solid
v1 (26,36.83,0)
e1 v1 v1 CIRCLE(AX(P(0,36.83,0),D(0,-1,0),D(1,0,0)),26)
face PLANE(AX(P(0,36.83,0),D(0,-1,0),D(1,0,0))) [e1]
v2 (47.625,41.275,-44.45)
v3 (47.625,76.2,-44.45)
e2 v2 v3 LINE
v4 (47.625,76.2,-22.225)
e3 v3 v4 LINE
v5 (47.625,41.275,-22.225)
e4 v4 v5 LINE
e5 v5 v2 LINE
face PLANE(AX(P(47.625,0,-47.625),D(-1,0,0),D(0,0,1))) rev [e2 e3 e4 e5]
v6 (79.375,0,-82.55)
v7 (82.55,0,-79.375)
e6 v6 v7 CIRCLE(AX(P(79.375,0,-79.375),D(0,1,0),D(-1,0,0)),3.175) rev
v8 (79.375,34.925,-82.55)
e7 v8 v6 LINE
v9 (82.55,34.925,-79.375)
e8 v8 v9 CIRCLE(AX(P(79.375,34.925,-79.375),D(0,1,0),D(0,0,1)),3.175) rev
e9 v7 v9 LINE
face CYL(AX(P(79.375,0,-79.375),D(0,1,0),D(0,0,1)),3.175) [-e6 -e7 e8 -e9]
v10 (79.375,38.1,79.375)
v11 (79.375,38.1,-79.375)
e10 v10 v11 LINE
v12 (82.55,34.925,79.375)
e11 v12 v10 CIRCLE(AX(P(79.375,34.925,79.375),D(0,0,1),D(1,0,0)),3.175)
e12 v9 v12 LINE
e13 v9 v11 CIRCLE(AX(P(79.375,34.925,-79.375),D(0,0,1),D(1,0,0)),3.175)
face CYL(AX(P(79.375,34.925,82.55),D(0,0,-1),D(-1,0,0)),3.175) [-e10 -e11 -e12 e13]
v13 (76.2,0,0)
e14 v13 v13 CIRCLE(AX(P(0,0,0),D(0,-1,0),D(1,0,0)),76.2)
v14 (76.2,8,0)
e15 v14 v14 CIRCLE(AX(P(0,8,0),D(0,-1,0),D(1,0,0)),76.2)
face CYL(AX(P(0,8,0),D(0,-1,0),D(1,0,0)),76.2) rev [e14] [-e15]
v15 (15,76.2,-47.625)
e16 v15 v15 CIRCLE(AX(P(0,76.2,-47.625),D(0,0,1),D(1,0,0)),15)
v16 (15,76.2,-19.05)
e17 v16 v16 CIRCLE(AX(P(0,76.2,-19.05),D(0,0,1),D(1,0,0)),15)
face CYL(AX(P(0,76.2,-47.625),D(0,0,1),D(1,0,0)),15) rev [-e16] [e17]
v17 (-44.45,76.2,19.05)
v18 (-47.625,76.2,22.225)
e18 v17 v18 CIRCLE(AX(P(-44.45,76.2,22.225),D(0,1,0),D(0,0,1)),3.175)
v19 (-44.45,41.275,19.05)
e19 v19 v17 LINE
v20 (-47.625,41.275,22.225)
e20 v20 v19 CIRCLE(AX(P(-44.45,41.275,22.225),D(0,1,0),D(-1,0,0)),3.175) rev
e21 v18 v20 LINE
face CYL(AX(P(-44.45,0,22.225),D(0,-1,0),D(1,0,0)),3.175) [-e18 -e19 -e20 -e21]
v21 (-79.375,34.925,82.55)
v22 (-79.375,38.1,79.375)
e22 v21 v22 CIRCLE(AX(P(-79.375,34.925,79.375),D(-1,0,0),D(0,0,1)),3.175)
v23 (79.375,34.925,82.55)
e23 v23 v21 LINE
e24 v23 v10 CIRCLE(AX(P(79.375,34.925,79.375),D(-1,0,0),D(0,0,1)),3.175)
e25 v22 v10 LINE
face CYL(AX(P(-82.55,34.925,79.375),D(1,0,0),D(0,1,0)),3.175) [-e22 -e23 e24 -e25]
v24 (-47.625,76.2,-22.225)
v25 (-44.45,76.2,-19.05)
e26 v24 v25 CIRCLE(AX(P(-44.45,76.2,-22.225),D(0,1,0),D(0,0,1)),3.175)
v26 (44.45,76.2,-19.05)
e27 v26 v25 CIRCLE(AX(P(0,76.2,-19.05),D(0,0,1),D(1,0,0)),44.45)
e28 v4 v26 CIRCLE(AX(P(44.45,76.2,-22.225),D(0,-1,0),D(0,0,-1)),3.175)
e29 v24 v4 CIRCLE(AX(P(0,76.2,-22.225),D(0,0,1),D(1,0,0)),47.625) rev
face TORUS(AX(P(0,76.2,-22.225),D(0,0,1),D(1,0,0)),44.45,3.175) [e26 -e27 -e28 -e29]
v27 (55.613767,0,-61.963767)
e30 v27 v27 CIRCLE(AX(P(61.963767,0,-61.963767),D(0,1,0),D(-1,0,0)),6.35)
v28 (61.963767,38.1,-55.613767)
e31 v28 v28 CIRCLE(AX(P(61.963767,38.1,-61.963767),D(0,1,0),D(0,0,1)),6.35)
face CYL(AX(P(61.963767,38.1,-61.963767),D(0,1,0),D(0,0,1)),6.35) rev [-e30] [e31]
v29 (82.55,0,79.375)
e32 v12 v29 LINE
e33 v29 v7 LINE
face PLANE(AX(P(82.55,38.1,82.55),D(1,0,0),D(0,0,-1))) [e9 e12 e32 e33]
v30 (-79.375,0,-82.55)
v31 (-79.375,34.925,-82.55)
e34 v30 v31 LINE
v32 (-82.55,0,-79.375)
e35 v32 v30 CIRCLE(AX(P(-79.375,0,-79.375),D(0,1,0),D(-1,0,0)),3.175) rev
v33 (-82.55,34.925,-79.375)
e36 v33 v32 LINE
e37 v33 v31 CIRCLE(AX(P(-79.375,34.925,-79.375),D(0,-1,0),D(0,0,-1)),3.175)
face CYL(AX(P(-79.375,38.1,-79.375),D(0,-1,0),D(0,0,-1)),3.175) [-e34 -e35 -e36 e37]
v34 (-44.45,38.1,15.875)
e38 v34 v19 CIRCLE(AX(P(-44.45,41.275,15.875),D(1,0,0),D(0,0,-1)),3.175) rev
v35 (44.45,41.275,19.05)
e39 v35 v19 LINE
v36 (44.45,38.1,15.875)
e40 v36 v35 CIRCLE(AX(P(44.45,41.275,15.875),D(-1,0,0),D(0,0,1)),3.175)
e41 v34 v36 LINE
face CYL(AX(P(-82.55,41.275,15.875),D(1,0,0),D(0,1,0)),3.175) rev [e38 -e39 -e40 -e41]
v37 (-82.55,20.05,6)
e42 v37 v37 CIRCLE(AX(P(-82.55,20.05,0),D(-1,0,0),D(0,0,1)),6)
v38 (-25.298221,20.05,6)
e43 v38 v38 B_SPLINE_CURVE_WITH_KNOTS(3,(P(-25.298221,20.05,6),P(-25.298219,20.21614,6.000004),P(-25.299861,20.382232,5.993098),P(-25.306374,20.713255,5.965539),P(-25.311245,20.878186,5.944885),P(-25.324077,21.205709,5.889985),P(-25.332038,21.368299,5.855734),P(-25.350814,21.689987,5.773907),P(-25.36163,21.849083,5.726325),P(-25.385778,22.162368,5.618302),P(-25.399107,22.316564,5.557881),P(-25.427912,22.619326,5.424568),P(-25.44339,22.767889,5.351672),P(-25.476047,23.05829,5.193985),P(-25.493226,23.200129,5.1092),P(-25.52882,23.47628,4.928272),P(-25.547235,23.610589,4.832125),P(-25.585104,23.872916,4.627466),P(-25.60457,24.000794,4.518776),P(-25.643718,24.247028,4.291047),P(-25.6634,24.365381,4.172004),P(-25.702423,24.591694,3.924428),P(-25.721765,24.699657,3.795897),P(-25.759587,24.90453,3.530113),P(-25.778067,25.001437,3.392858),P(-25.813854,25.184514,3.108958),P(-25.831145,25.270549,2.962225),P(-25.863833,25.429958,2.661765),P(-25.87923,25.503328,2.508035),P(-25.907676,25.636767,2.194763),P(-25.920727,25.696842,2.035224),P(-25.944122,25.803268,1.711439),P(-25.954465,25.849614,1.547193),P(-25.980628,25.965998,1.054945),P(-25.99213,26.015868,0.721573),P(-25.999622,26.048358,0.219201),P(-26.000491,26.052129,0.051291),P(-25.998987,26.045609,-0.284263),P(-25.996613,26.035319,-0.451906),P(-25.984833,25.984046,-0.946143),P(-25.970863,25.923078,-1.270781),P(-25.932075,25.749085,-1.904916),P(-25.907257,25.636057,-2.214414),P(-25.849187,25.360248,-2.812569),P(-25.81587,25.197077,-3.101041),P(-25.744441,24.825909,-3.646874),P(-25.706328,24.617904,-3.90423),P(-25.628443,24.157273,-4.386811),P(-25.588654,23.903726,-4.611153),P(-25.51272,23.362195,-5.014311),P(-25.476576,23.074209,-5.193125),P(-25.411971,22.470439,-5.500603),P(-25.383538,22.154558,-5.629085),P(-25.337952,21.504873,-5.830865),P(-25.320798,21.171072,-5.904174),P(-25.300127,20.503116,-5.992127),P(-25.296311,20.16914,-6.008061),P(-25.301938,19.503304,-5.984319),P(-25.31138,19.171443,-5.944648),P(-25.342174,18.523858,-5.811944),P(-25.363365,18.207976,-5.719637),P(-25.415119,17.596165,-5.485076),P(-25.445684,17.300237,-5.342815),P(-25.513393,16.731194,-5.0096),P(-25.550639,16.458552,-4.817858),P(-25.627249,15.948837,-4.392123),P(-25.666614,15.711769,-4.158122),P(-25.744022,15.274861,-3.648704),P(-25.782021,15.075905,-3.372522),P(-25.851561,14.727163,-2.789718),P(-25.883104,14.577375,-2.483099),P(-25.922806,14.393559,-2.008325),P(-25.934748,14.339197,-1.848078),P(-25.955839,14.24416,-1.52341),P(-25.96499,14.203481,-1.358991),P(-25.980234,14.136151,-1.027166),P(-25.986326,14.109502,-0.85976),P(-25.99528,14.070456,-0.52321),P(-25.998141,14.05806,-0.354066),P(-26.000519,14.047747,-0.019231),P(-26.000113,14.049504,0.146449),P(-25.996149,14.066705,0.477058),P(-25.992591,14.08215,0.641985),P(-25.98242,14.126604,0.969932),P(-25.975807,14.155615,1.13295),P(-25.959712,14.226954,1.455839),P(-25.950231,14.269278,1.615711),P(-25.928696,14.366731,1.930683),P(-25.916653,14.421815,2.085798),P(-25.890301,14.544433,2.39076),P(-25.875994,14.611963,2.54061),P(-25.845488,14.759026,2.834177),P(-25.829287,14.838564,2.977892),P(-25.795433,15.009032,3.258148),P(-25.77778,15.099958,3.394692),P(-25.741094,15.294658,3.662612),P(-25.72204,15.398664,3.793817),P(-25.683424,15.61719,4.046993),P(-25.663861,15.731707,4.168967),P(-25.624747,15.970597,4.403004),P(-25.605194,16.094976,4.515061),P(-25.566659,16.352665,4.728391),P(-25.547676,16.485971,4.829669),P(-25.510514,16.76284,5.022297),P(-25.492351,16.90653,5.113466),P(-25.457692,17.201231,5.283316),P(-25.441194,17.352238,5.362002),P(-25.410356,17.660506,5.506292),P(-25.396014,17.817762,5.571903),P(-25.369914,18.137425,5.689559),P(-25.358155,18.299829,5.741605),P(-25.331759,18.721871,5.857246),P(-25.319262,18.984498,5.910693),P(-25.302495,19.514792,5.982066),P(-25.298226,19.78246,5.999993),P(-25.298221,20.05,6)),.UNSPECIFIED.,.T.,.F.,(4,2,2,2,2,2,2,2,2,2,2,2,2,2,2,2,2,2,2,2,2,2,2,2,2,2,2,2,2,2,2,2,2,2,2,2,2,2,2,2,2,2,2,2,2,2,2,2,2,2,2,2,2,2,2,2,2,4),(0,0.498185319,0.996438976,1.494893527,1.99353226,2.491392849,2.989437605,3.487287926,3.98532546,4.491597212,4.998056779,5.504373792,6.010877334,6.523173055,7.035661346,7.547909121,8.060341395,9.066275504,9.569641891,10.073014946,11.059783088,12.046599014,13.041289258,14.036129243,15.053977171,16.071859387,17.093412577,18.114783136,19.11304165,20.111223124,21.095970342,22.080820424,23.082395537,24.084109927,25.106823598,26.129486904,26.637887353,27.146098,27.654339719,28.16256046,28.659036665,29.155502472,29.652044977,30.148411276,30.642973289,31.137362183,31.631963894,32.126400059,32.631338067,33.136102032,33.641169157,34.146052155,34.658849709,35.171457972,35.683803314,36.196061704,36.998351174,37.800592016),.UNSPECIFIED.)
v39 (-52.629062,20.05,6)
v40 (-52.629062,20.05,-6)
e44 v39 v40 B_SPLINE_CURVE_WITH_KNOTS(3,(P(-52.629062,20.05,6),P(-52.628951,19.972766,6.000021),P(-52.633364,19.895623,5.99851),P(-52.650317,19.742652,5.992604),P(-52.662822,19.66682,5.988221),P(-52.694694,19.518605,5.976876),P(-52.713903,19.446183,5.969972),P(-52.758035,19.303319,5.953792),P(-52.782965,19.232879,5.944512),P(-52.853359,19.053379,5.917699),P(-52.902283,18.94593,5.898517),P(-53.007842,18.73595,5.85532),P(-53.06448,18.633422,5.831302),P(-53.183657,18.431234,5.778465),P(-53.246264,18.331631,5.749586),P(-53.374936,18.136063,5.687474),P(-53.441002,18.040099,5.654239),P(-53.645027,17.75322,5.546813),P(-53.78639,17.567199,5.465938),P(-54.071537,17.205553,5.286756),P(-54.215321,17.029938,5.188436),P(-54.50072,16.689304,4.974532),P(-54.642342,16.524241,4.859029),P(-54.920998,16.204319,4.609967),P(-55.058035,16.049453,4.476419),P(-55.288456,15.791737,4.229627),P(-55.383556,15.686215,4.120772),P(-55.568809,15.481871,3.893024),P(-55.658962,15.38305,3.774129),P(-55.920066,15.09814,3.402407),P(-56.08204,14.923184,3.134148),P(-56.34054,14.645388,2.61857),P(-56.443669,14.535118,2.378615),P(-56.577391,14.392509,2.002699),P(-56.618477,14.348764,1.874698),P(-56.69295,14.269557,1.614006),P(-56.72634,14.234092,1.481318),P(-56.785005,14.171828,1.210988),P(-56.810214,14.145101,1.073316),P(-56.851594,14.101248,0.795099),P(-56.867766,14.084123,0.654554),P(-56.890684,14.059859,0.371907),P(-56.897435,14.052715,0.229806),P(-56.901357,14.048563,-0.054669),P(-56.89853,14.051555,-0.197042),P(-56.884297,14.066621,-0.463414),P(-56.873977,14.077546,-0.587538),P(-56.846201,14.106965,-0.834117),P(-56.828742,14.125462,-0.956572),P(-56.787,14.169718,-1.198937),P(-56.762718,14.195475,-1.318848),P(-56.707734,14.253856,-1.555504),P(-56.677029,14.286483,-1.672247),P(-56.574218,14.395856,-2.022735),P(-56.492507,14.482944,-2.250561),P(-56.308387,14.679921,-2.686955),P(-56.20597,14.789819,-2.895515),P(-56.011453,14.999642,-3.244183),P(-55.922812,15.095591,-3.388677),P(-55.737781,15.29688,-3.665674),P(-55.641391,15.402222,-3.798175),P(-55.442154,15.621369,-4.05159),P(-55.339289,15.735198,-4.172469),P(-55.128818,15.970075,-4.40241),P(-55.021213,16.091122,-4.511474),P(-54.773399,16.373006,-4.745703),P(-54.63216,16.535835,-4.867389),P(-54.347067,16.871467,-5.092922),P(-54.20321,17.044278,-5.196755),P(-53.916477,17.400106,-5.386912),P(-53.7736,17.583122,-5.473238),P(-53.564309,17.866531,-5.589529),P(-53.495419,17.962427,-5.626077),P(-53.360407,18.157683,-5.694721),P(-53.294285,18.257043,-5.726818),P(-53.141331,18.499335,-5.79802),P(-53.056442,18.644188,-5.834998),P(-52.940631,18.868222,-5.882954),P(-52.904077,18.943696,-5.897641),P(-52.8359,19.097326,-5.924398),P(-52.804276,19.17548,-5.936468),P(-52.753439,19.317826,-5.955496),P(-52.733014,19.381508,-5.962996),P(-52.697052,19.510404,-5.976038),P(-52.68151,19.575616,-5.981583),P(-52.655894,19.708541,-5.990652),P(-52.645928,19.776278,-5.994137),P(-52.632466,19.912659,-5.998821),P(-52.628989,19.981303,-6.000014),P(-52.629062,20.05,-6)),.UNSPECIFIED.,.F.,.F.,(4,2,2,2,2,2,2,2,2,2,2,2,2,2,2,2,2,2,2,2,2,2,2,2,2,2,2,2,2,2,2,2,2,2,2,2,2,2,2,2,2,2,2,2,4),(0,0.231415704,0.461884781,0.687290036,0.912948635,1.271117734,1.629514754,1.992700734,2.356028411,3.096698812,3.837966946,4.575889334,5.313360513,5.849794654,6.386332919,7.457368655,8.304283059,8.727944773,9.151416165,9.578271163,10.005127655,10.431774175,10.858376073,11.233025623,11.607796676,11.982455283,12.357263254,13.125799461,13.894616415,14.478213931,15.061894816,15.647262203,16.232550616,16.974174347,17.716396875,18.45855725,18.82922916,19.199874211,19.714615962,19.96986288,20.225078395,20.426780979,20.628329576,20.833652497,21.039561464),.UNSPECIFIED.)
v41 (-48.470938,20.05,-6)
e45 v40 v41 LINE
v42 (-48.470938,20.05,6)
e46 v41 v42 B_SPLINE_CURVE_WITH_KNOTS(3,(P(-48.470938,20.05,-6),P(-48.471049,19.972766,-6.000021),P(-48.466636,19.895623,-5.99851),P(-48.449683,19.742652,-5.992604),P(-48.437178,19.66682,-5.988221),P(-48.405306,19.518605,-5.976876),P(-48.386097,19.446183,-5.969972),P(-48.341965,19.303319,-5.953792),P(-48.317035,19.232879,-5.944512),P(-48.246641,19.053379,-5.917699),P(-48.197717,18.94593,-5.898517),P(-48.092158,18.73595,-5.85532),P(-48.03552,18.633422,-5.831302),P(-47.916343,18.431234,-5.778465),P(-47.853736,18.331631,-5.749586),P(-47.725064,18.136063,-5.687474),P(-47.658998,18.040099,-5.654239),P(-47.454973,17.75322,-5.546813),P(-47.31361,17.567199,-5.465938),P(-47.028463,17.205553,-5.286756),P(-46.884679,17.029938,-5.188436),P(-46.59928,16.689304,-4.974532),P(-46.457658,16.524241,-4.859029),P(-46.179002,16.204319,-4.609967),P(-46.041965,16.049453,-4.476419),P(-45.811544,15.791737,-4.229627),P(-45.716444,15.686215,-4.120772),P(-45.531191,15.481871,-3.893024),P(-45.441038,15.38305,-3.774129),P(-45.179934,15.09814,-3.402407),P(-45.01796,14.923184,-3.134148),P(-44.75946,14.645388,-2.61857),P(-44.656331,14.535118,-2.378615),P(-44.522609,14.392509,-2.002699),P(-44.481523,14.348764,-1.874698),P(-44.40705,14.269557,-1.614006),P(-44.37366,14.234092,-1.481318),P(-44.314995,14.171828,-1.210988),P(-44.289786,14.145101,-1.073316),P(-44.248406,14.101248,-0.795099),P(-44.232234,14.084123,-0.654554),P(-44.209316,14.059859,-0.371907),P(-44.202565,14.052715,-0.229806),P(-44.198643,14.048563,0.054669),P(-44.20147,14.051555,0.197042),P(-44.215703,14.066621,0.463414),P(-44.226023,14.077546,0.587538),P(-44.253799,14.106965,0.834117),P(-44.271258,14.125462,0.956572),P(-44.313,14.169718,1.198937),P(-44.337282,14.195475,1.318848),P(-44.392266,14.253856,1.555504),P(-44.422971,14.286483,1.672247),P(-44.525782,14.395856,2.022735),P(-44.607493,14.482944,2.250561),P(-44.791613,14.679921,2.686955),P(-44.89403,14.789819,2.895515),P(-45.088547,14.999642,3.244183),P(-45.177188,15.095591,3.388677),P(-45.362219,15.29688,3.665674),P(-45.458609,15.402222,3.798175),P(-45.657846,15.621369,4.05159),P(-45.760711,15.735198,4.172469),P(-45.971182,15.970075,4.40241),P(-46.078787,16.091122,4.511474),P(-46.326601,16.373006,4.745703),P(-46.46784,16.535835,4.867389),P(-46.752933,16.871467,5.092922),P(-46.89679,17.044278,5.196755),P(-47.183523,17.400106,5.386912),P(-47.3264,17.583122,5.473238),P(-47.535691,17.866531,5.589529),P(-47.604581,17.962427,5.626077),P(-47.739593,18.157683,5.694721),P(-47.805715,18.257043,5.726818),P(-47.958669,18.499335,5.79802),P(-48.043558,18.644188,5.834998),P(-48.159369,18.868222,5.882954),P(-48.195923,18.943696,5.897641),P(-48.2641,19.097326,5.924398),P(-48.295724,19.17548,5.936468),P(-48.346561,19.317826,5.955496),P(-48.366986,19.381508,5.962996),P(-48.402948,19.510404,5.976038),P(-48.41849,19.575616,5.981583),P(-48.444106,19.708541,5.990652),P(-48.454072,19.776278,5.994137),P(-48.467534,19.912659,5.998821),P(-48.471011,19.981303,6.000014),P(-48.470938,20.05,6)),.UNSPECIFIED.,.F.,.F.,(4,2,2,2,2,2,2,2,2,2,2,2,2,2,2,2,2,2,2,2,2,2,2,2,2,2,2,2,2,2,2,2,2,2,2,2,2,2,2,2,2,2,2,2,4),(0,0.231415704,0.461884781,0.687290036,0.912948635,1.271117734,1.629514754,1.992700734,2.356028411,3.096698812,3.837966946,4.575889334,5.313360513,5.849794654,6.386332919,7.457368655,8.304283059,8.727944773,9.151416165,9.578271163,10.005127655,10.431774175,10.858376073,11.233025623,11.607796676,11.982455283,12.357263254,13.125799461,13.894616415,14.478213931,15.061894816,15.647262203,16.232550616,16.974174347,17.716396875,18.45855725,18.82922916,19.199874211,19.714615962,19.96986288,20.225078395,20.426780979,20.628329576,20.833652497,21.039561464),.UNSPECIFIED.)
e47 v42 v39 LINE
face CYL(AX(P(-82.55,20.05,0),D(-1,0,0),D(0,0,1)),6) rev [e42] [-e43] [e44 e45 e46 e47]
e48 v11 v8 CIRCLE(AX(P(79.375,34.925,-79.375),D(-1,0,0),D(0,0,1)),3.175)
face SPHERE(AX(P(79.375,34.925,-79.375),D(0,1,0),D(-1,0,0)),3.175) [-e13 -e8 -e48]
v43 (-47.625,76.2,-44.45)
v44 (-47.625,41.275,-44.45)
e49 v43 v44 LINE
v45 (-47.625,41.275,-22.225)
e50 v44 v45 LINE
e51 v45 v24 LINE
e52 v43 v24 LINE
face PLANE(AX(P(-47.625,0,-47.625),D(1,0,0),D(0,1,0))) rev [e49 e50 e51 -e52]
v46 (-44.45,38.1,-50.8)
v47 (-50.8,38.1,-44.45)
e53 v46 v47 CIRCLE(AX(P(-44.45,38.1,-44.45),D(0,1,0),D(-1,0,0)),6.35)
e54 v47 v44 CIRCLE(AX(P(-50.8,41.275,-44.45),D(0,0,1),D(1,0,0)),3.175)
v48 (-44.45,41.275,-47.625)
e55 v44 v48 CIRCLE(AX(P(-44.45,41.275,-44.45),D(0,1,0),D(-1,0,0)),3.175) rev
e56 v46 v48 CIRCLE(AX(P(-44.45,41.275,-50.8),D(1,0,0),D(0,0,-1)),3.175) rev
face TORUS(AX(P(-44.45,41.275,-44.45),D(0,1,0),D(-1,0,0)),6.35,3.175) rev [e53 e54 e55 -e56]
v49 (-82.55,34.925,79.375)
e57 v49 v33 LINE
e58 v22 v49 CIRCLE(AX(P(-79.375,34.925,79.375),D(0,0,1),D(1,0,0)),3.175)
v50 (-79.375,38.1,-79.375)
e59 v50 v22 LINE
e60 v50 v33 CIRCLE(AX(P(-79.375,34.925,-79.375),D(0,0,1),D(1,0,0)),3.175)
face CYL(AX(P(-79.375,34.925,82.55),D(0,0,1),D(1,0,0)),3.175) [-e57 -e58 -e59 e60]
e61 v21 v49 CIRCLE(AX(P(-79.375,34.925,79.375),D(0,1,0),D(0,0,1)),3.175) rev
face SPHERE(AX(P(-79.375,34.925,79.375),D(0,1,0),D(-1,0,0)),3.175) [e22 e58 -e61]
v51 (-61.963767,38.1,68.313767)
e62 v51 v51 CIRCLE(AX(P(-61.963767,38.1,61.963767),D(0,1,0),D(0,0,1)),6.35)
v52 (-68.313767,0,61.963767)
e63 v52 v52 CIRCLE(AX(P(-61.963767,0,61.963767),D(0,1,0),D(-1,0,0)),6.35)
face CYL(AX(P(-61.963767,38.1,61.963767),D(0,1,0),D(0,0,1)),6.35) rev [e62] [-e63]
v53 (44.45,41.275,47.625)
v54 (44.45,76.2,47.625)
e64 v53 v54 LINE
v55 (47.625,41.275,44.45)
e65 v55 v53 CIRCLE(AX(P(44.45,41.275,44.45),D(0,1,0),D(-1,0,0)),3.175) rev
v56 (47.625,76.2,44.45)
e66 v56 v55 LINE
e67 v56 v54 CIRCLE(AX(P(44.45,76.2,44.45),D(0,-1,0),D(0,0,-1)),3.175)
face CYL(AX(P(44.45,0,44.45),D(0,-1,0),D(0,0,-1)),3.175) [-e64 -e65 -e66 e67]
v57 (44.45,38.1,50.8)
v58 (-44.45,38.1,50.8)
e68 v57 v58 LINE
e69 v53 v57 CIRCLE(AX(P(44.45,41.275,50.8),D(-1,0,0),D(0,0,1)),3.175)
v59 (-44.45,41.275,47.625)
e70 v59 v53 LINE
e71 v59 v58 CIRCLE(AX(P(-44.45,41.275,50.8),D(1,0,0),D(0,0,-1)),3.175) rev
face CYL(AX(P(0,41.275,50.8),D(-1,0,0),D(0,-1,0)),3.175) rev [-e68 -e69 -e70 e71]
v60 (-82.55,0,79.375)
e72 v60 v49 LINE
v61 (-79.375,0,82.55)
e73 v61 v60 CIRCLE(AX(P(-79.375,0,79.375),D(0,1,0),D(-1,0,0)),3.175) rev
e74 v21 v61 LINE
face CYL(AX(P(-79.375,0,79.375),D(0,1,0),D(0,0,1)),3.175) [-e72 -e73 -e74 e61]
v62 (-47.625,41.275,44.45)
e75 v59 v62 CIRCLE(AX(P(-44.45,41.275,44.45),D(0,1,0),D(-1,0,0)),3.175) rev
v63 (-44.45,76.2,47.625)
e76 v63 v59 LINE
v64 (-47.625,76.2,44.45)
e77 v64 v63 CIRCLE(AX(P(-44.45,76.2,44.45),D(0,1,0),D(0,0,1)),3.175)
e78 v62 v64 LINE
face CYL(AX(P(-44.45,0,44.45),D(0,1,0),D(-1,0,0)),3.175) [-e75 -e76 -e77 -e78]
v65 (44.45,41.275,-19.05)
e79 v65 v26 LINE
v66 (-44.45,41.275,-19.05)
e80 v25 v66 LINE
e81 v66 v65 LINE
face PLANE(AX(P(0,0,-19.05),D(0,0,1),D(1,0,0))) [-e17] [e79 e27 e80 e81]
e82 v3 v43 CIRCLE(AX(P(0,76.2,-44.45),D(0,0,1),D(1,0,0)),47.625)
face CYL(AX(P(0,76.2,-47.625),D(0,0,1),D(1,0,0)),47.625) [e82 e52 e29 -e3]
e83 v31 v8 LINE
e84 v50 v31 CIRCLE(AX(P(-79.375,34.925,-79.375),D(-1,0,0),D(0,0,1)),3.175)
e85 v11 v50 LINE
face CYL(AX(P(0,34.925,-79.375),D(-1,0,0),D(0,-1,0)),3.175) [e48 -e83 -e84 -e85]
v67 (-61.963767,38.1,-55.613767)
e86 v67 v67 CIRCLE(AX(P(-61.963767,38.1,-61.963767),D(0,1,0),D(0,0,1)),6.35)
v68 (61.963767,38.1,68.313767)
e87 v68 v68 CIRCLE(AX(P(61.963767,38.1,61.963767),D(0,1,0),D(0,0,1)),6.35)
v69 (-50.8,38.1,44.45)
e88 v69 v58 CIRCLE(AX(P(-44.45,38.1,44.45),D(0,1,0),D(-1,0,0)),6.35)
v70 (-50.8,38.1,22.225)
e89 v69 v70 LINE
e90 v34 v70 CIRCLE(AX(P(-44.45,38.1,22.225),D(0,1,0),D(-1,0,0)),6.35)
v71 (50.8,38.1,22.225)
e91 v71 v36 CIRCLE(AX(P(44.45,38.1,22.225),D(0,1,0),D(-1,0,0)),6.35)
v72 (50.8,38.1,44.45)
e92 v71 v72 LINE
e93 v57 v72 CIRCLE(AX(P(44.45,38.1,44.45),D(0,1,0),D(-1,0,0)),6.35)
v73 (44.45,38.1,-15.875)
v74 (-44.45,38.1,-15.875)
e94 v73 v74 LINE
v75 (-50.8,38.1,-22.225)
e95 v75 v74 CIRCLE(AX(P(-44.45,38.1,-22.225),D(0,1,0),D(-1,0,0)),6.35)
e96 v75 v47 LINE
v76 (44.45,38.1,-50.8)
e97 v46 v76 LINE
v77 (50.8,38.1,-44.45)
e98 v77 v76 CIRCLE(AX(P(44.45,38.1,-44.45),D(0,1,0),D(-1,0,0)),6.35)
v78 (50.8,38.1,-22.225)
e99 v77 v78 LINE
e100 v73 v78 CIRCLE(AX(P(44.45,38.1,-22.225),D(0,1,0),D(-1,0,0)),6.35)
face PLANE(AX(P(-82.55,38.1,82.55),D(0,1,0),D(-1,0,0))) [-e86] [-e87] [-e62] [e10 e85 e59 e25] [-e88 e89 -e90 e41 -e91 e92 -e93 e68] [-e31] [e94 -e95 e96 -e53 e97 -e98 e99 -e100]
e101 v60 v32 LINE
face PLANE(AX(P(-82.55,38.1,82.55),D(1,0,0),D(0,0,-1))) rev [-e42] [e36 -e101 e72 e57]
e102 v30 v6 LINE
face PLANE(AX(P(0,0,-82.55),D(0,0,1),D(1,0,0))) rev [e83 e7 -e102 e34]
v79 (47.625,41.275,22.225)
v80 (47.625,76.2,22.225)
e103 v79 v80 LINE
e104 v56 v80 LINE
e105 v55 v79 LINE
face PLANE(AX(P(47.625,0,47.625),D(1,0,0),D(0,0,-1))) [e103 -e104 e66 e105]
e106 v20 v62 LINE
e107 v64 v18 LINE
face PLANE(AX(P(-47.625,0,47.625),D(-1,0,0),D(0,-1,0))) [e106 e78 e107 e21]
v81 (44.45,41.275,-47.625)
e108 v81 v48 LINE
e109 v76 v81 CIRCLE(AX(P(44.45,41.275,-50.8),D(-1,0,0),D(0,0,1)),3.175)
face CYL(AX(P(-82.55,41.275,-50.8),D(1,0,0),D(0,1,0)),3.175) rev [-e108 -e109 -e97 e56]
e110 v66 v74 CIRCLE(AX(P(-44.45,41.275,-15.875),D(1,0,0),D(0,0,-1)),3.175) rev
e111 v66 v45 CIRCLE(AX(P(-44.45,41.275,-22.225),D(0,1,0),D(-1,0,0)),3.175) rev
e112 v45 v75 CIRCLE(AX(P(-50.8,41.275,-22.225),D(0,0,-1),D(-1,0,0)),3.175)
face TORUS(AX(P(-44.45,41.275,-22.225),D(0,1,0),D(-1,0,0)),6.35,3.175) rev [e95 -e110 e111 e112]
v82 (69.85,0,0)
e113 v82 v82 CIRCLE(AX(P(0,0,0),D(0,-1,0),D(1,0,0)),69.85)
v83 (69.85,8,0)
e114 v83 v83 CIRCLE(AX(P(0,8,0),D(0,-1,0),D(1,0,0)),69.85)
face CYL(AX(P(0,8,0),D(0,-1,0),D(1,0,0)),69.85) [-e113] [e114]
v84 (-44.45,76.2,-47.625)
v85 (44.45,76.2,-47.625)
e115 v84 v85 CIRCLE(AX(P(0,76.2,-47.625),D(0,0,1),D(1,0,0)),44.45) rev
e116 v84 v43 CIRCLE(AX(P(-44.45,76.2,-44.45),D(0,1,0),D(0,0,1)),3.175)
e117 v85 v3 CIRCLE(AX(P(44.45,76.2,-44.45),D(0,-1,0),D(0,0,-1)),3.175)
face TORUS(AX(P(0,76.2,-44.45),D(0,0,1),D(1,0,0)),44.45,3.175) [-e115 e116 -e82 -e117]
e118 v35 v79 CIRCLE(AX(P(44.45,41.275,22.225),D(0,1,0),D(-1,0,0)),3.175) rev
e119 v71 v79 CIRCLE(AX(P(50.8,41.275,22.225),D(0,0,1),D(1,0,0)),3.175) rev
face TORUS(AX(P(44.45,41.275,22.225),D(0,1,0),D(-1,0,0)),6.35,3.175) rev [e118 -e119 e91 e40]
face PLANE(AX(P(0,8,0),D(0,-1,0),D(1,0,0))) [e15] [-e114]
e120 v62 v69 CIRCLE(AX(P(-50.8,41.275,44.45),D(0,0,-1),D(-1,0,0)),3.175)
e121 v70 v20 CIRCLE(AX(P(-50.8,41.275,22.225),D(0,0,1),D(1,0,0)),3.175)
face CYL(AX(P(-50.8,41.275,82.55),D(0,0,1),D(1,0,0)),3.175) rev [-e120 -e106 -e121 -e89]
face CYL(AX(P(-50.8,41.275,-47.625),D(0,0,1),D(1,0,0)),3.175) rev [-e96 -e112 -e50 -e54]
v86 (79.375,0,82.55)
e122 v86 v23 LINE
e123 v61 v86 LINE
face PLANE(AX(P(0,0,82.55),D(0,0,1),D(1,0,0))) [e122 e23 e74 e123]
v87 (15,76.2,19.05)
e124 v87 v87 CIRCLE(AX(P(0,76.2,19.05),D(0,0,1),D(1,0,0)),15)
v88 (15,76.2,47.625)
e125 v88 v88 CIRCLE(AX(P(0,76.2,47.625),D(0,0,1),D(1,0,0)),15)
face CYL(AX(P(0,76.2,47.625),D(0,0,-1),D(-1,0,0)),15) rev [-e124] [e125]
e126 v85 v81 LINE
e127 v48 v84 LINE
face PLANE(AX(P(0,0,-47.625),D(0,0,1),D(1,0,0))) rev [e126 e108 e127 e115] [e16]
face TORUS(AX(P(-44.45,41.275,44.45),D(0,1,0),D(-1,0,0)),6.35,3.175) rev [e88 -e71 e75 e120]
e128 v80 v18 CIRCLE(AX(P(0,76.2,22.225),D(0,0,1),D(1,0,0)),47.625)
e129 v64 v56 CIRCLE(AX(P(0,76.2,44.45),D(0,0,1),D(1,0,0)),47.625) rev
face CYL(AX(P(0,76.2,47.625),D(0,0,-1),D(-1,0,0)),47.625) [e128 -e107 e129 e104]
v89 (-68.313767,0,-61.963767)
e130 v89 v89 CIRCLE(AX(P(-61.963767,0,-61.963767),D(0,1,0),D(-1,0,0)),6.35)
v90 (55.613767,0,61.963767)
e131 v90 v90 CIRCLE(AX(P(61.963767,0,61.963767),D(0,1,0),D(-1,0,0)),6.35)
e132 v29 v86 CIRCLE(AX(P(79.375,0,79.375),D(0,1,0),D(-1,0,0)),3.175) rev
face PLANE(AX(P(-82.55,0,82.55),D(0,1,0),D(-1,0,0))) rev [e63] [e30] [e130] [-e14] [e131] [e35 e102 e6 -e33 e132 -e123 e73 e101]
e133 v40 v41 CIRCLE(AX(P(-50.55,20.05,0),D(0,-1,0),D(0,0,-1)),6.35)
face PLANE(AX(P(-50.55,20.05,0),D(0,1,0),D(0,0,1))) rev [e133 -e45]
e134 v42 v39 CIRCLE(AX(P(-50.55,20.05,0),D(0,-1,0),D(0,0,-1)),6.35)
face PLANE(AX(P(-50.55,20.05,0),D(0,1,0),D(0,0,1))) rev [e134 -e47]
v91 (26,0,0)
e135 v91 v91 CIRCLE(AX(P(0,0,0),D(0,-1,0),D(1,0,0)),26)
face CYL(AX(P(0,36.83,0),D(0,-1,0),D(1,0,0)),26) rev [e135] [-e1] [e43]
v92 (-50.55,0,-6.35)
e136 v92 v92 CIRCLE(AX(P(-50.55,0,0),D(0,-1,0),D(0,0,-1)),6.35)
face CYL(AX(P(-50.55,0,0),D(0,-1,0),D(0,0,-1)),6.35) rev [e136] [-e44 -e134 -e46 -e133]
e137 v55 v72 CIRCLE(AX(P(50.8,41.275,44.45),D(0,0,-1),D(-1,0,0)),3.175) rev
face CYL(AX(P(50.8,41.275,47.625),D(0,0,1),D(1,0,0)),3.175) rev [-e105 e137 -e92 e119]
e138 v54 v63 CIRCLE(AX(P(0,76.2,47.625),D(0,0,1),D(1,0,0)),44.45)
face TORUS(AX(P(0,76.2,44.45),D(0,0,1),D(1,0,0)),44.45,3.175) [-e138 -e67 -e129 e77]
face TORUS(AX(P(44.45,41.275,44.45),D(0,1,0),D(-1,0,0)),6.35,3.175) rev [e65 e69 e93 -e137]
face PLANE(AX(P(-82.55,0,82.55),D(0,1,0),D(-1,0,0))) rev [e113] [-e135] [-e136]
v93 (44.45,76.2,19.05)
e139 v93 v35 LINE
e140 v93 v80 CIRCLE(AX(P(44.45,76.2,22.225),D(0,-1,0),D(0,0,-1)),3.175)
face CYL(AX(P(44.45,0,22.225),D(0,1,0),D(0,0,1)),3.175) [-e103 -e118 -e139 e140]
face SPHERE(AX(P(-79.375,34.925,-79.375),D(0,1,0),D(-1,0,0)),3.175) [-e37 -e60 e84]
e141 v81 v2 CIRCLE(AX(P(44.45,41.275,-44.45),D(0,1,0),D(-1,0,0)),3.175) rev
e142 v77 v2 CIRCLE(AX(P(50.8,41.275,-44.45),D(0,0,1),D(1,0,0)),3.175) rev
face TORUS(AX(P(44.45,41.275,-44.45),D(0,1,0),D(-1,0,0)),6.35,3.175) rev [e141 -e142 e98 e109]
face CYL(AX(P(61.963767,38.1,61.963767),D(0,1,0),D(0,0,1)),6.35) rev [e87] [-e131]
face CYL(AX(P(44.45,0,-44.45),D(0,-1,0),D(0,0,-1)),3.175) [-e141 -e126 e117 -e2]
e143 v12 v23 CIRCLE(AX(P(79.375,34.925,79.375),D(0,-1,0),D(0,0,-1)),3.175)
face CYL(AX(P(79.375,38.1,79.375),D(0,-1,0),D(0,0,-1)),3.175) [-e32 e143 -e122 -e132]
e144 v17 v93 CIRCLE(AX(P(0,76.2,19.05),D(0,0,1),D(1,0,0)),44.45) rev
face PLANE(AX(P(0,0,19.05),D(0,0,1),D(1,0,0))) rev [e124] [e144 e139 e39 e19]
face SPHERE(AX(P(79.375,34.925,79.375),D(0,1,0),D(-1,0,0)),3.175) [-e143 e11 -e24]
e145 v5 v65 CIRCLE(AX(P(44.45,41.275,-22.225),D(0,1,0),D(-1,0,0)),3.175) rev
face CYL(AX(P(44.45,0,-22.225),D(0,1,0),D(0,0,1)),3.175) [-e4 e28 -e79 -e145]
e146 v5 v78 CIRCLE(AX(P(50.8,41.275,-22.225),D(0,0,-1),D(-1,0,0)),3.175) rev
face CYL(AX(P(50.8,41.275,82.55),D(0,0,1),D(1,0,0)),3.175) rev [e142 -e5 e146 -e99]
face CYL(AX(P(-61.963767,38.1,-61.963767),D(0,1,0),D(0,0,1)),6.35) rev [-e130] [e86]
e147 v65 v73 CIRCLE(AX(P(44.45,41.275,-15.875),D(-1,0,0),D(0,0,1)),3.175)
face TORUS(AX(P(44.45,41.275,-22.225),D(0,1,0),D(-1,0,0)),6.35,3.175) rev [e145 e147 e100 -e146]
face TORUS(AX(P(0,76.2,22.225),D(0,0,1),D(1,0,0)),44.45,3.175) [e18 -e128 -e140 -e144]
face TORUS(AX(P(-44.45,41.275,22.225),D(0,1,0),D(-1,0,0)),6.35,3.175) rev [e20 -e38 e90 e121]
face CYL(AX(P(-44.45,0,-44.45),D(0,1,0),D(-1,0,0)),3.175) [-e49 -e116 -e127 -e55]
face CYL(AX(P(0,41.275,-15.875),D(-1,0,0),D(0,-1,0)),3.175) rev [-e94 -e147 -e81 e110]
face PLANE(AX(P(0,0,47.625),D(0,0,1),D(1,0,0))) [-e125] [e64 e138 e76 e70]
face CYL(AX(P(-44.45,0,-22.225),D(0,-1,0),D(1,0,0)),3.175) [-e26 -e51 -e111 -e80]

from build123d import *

# Parameters (mm, degrees)
SKETCH1_W                     = 165.1
SKETCH1_H                     = 38.1
BOSS_EXTRUDE1_DEPTH           = 82.55
BOSS_EXTRUDE2_START           = 19.05
SKETCH1_3_R                   = 15
BOSS_EXTRUDE2_DEPTH           = 28.575
BOSS_EXTRUDE3_START           = -47.625
SKETCH1_5_R                   = 15
BOSS_EXTRUDE3_DEPTH           = 28.575
SKETCH2_R                     = 26
CUT_EXTRUDE1_DEPTH            = 36.83
SKETCH2_3_R                   = 76.2
SKETCH2_3_R_2                 = 69.85
CUT_EXTRUDE2_DEPTH            = 8
M14X2_0_TAPPED_HOLE1_REACH    = 224.273
M14X2_0_TAPPED_HOLE1_BORE_R   = 6
F_1_0MM_DOWEL_HOLE1_OUTLINE_R = 6.35
F_1_0MM_DOWEL_HOLE1_DEPTH     = 20.05
F_1_0MM_DOWEL_HOLE2_D         = 12.7
FILLET1_R                     = 3.175
FILLET2_R                     = 3.175


# Read off the part's stored shape, not the designer's step: Ø1.0mm Dowel Hole1
with BuildPart() as part:
    # Sketch1 → Boss-Extrude1 (new, symmetric)
    with BuildSketch(Plane.XY):
        with Locations((0, 19.05)):
            Rectangle(SKETCH1_W, SKETCH1_H)
    extrude(amount=BOSS_EXTRUDE1_DEPTH, both=True)

    # Sketch1<3> → Boss-Extrude2 (add)
    with BuildSketch(Plane.XY.offset(BOSS_EXTRUDE2_START)):
        with BuildLine():
            Line((-47.625, 76.2), (-47.625, 38.1))
            Line((-47.625, 38.1), (47.625, 38.1))
            Line((47.625, 38.1), (47.625, 76.2))
            ThreePointArc((47.625, 76.2), (0, 123.825), (-47.625, 76.2))
        make_face()
        with Locations((0, 76.2)):
            Circle(SKETCH1_3_R, mode=Mode.SUBTRACT)
    extrude(amount=BOSS_EXTRUDE2_DEPTH)

    # Sketch1<5> → Boss-Extrude3 (add)
    with BuildSketch(Plane.XY.offset(BOSS_EXTRUDE3_START)):
        with BuildLine():
            Line((-47.625, 76.2), (-47.625, 38.1))
            Line((-47.625, 38.1), (47.625, 38.1))
            Line((47.625, 38.1), (47.625, 76.2))
            ThreePointArc((47.625, 76.2), (0, 123.825), (-47.625, 76.2))
        make_face()
        with Locations((0, 76.2)):
            Circle(SKETCH1_5_R, mode=Mode.SUBTRACT)
    extrude(amount=BOSS_EXTRUDE3_DEPTH)

    # Sketch2 → Cut-Extrude1 (cut)
    with BuildSketch(Plane.XZ):
        Circle(SKETCH2_R)
    extrude(amount=-CUT_EXTRUDE1_DEPTH, mode=Mode.SUBTRACT)

    # Sketch2<3> → Cut-Extrude2 (cut)
    with BuildSketch(Plane.XZ):
        Circle(SKETCH2_3_R)
        Circle(SKETCH2_3_R_2, mode=Mode.SUBTRACT)
    extrude(amount=-CUT_EXTRUDE2_DEPTH, mode=Mode.SUBTRACT)

    # M14x2.0 Tapped Hole1 bore → M14x2.0 Tapped Hole1 (cut, up to next)
    with BuildSketch(Plane.ZY.offset(82.55), mode=Mode.PRIVATE) as m14x2_0_tapped_hole1_sk1:
        with Locations((0, 20.05)):
            Circle(M14X2_0_TAPPED_HOLE1_BORE_R)
    m14x2_0_tapped_hole1_tool1 = extrude(m14x2_0_tapped_hole1_sk1.sketch, amount=-M14X2_0_TAPPED_HOLE1_REACH, mode=Mode.PRIVATE) & part.part
    add(m14x2_0_tapped_hole1_tool1.solids().sort_by_distance((-82.55, 20.05, 0))[0], mode=Mode.SUBTRACT)

    # Ø1.0mm Dowel Hole1 outline → Ø1.0mm Dowel Hole1 (cut)
    with BuildSketch(Plane(origin=(0, 0, 0), x_dir=(1, 0, 0), z_dir=(0, 1, 0))):
        with Locations((-50.55, 0)):
            Circle(F_1_0MM_DOWEL_HOLE1_OUTLINE_R)
    extrude(amount=F_1_0MM_DOWEL_HOLE1_DEPTH, mode=Mode.SUBTRACT)

    # Ø1.0mm Dowel Hole2 (through all)
    with Locations(Plane(origin=(0, 38.1, 0), x_dir=(1, 0, 0), z_dir=(0, 1, 0))):
        with Locations((-61.963767235, 61.963767235), (61.963767235, -61.963767235), (-61.963767235, -61.963767235), (61.963767235, 61.963767235)):
            Hole(F_1_0MM_DOWEL_HOLE2_D / 2)

    # Fillet1
    fillet1_edges = [part.edges().sort_by_distance(p)[0] for p in [
        (82.55, 19.05, 82.55),
        (-82.55, 19.05, 82.55),
        (82.55, 19.05, -82.55),
        (-82.55, 19.05, -82.55),
    ]]
    fillet(fillet1_edges, radius=FILLET1_R)

    # Fillet2
    fillet2_edges = [part.edges().sort_by_distance(p)[0] for p in [
        (0, 38.1, -82.55),
        (82.55, 38.1, 0),
        (-82.55, 38.1, 0),
        (0, 38.1, 82.55),
        (-81.62006403, 38.1, 81.62006403),
        (81.62006403, 38.1, 81.62006403),
        (-81.62006403, 38.1, -81.62006403),
        (81.62006403, 38.1, -81.62006403),
        (0, 123.825, 47.625),
        (-47.625, 57.15, 47.625),
        (0, 38.1, 19.05),
        (-47.625, 38.1, 33.3375),
        (47.625, 57.15, 47.625),
        (47.625, 38.1, 33.3375),
        (0, 38.1, 47.625),
        (0, 123.825, 19.05),
        (47.625, 57.15, 19.05),
        (-47.625, 57.15, 19.05),
        (0, 123.825, -19.05),
        (47.625, 57.15, -19.05),
        (0, 38.1, -47.625),
        (47.625, 38.1, -33.3375),
        (-47.625, 57.15, -19.05),
        (-47.625, 38.1, -33.3375),
        (0, 123.825, -47.625),
        (47.625, 57.15, -47.625),
        (-47.625, 57.15, -47.625),
        (0, 38.1, -19.05),
    ]]
    fillet(fillet2_edges, radius=FILLET2_R)


solid = part.part
